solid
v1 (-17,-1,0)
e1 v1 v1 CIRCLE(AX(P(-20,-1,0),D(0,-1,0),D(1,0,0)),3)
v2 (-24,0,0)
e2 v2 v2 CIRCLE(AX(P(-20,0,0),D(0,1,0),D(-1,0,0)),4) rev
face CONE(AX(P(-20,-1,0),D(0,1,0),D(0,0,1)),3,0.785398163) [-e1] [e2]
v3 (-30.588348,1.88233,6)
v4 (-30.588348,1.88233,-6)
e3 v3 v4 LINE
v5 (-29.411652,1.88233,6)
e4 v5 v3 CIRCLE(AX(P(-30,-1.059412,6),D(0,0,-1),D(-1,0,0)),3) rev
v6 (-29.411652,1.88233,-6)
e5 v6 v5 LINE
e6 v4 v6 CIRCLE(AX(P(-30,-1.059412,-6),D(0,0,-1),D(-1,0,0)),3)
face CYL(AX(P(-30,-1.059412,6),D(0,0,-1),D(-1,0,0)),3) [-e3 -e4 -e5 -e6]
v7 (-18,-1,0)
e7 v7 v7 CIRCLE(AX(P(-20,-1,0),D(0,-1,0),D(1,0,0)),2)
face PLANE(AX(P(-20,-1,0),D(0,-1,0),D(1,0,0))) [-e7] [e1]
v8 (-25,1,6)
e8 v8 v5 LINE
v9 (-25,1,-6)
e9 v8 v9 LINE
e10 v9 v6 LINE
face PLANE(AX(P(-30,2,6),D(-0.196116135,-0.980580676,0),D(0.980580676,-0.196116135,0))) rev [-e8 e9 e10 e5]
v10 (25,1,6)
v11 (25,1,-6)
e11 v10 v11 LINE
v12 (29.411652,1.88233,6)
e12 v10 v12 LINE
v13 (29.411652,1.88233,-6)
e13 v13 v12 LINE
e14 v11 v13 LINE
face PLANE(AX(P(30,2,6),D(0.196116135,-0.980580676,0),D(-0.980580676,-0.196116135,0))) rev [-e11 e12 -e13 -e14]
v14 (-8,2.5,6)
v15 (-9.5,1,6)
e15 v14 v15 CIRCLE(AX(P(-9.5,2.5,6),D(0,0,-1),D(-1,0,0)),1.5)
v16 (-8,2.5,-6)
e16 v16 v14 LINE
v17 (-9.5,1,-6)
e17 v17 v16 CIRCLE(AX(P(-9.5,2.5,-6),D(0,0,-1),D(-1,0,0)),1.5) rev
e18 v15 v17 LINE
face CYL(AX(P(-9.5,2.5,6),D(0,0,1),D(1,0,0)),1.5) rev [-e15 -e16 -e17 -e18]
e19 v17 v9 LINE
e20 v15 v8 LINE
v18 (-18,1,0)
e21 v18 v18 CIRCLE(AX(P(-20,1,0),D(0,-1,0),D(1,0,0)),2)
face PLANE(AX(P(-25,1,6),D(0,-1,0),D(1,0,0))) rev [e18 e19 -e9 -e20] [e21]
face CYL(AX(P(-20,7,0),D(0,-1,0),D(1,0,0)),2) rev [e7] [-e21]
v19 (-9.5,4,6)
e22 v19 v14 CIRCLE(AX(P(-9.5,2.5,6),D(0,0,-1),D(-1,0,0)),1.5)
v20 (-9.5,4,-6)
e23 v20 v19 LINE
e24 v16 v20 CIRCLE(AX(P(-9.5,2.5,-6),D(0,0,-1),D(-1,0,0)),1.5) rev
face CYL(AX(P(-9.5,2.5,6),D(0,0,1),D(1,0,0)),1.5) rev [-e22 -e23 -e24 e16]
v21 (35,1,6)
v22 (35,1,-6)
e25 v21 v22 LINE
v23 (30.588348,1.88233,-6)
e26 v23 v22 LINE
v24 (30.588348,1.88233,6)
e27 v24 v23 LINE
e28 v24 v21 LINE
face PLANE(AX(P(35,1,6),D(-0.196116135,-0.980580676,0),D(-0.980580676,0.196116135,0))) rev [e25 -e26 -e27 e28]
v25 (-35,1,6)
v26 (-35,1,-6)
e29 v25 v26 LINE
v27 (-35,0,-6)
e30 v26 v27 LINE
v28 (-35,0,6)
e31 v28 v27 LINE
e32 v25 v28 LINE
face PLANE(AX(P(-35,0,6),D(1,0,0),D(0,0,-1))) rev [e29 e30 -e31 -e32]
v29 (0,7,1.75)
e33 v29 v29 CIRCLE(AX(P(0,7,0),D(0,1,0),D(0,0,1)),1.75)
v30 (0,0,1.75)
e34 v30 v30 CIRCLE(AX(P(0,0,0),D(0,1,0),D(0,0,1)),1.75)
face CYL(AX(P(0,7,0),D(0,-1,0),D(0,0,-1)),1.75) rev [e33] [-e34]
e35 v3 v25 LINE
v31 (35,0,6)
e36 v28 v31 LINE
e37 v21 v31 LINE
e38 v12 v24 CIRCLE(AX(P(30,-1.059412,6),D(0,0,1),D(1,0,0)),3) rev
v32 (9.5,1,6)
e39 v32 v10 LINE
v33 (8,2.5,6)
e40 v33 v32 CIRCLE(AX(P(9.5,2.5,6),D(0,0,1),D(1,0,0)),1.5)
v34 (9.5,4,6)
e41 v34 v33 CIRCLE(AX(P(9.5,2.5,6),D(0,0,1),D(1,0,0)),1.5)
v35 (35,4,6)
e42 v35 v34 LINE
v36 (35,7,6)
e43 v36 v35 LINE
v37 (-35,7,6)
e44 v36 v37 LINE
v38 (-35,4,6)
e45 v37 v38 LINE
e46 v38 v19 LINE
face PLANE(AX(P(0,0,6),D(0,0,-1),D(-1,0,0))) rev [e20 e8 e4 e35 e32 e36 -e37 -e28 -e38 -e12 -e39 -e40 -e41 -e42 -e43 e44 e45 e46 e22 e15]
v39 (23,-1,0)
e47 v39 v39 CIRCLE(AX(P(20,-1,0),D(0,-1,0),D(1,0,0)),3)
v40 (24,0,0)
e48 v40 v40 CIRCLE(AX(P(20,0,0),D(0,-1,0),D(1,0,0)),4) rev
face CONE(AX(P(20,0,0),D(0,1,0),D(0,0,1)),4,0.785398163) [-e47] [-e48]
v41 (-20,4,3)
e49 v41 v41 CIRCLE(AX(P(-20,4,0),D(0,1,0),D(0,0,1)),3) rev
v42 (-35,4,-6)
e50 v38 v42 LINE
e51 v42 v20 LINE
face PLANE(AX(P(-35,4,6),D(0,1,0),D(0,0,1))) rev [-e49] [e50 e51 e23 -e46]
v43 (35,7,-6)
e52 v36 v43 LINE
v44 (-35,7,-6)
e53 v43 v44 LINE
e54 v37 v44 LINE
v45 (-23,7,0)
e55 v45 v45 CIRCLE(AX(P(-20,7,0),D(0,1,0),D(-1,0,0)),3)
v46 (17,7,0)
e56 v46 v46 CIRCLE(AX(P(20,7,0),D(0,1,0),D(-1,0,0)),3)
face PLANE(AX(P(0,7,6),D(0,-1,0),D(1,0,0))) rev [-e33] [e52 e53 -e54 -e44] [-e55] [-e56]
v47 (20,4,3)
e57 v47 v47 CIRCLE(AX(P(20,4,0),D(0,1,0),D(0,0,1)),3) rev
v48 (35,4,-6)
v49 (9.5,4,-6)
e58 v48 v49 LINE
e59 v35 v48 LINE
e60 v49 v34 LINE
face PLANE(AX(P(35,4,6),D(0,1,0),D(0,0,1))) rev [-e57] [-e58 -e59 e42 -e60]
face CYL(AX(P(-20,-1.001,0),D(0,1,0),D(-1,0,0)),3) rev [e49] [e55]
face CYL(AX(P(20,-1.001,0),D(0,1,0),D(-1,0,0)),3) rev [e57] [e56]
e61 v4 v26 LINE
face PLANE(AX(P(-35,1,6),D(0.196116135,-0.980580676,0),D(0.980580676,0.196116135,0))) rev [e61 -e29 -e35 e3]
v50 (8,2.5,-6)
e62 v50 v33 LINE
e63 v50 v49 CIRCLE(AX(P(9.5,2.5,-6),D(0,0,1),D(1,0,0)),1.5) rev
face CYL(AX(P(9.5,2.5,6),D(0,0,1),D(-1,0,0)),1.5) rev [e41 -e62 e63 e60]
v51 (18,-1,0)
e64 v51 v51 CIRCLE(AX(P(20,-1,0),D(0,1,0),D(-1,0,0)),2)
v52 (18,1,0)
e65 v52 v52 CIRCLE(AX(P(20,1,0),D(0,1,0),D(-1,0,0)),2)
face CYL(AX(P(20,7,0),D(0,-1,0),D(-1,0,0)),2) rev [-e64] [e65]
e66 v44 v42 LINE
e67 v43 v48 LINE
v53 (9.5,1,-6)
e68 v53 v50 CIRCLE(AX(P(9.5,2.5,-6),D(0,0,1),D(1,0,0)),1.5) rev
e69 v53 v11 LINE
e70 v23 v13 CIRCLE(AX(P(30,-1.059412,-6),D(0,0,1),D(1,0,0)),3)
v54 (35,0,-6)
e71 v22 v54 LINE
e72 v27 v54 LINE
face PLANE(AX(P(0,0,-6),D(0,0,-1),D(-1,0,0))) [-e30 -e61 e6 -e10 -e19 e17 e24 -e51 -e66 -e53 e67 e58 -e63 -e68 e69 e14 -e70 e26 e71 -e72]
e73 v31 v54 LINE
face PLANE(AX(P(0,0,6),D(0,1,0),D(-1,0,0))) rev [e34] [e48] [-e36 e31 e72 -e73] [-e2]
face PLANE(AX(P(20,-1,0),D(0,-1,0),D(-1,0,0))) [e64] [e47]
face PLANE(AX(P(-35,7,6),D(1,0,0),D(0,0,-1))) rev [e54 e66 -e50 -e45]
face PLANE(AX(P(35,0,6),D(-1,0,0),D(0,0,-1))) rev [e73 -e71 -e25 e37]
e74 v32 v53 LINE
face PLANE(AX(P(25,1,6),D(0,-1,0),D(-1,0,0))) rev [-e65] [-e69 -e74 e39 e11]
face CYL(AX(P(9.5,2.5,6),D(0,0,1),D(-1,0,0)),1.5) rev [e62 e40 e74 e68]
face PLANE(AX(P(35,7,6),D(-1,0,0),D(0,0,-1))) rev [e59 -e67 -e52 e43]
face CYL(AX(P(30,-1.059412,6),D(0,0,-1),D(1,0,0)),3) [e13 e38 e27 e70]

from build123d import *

# Parameters (mm, degrees)
BOSS_EXTRUDE1_DEPTH = 6
SKETCH5_R           = 4
BOSS_EXTRUDE2_DEPTH = 1
BOSS_EXTRUDE3_DEPTH = 6
SKETCH6_R           = 2
CUT_EXTRUDE2_DEPTH  = 37.400549446
FILLET2_R           = 3
FILLET3_R           = 1.5
SKETCH3_R           = 1.75
CUT_EXTRUDE1_DEPTH  = 37.193922142
CUT_EXTRUDE3_REACH  = 38.401
SKETCH8_R           = 3
CHAMFER1_SIZE       = 1


with BuildPart() as part:
    # Sketch1 → Boss-Extrude1 (new, symmetric)
    with BuildSketch(Plane.XY):
        Polygon((-35, 0), (-35, 1), (-30, 2), (-25, 1), (0, 1), (0, 0), align=None)
    extrude(amount=BOSS_EXTRUDE1_DEPTH, both=True)

    # Sketch5 → Boss-Extrude2 (add)
    with BuildSketch(Plane.XZ):
        with Locations(Location((-20, 0, 0), (0, 0, 180))):
            Circle(SKETCH5_R)
    extrude(amount=BOSS_EXTRUDE2_DEPTH)

    # Sketch7 → Boss-Extrude3 (add, symmetric)
    with BuildSketch(Plane.XY):
        Polygon((0, 1), (0, 7), (-35, 7), (-35, 4), (-8, 4), (-8, 1), align=None)
    extrude(amount=BOSS_EXTRUDE3_DEPTH, both=True)

    # Sketch6 → Cut-Extrude2 (cut, through all)
    with BuildSketch(Plane.XZ.offset(1)):
        with Locations((-20, 0)):
            Circle(SKETCH6_R)
    extrude(amount=-CUT_EXTRUDE2_DEPTH, mode=Mode.SUBTRACT)

    # Fillet2
    fillet2_edges = [part.edges().sort_by_distance(p)[0] for p in [
        (-30, 2, 0),
    ]]
    fillet(fillet2_edges, radius=FILLET2_R)

    # Fillet3
    fillet3_edges = [part.edges().sort_by_distance(p)[0] for p in [
        (-8, 4, 0),
        (-8, 1, 0),
    ]]
    fillet(fillet3_edges, radius=FILLET3_R - 0.0001)  # a hair under: the kernel refuses the full size

    # Mirror1: part across plane


with BuildPart() as part_1:
    add(part.part)
    add(part.part.mirror(Plane(origin=(0, 0, 0), x_dir=(0, 0, 1), z_dir=(1, 0, 0))))

    # Sketch3 → Cut-Extrude1 (cut, through all)
    with BuildSketch(Plane(origin=(0, 0, 0), x_dir=(1, 0, 0), z_dir=(0, 1, 0))):
        with Locations(Location((0, 0, 0), (0, 0, 270))):
            Circle(SKETCH3_R)
    extrude(amount=CUT_EXTRUDE1_DEPTH, mode=Mode.SUBTRACT)

    # Sketch8 → Cut-Extrude3 (cut, up to next)
    with BuildSketch(Plane(origin=(0, 7, 0), x_dir=(1, 0, 0), z_dir=(0, 1, 0)), mode=Mode.PRIVATE) as cut_extrude3_sk1:
        with Locations(Location((20, 0, 0), (0, 0, 180))):
            Circle(SKETCH8_R)
    cut_extrude3_tool1 = extrude(cut_extrude3_sk1.sketch, amount=-CUT_EXTRUDE3_REACH, mode=Mode.PRIVATE) & part_1.part
    # Sketch8 → Cut-Extrude3 (cut, up to next)
    with BuildSketch(Plane(origin=(0, 7, 0), x_dir=(1, 0, 0), z_dir=(0, 1, 0)), mode=Mode.PRIVATE) as cut_extrude3_sk2:
        with Locations(Location((-20, 0, 0), (0, 0, 180))):
            Circle(SKETCH8_R)
    cut_extrude3_tool2 = extrude(cut_extrude3_sk2.sketch, amount=-CUT_EXTRUDE3_REACH, mode=Mode.PRIVATE) & part_1.part
    add(cut_extrude3_tool1.solids().sort_by_distance((20, 7, 0))[0], mode=Mode.SUBTRACT)
    add(cut_extrude3_tool2.solids().sort_by_distance((-20, 7, 0))[0], mode=Mode.SUBTRACT)

    # Chamfer1
    chamfer1_edges = [part_1.edges().sort_by_distance(p)[0] for p in [
        (-16, -1, 0),
        (16, -1, 0),
    ]]
    chamfer(chamfer1_edges, length=CHAMFER1_SIZE - 0.0001)  # a hair under: the kernel refuses the full size


solid = part_1.part
